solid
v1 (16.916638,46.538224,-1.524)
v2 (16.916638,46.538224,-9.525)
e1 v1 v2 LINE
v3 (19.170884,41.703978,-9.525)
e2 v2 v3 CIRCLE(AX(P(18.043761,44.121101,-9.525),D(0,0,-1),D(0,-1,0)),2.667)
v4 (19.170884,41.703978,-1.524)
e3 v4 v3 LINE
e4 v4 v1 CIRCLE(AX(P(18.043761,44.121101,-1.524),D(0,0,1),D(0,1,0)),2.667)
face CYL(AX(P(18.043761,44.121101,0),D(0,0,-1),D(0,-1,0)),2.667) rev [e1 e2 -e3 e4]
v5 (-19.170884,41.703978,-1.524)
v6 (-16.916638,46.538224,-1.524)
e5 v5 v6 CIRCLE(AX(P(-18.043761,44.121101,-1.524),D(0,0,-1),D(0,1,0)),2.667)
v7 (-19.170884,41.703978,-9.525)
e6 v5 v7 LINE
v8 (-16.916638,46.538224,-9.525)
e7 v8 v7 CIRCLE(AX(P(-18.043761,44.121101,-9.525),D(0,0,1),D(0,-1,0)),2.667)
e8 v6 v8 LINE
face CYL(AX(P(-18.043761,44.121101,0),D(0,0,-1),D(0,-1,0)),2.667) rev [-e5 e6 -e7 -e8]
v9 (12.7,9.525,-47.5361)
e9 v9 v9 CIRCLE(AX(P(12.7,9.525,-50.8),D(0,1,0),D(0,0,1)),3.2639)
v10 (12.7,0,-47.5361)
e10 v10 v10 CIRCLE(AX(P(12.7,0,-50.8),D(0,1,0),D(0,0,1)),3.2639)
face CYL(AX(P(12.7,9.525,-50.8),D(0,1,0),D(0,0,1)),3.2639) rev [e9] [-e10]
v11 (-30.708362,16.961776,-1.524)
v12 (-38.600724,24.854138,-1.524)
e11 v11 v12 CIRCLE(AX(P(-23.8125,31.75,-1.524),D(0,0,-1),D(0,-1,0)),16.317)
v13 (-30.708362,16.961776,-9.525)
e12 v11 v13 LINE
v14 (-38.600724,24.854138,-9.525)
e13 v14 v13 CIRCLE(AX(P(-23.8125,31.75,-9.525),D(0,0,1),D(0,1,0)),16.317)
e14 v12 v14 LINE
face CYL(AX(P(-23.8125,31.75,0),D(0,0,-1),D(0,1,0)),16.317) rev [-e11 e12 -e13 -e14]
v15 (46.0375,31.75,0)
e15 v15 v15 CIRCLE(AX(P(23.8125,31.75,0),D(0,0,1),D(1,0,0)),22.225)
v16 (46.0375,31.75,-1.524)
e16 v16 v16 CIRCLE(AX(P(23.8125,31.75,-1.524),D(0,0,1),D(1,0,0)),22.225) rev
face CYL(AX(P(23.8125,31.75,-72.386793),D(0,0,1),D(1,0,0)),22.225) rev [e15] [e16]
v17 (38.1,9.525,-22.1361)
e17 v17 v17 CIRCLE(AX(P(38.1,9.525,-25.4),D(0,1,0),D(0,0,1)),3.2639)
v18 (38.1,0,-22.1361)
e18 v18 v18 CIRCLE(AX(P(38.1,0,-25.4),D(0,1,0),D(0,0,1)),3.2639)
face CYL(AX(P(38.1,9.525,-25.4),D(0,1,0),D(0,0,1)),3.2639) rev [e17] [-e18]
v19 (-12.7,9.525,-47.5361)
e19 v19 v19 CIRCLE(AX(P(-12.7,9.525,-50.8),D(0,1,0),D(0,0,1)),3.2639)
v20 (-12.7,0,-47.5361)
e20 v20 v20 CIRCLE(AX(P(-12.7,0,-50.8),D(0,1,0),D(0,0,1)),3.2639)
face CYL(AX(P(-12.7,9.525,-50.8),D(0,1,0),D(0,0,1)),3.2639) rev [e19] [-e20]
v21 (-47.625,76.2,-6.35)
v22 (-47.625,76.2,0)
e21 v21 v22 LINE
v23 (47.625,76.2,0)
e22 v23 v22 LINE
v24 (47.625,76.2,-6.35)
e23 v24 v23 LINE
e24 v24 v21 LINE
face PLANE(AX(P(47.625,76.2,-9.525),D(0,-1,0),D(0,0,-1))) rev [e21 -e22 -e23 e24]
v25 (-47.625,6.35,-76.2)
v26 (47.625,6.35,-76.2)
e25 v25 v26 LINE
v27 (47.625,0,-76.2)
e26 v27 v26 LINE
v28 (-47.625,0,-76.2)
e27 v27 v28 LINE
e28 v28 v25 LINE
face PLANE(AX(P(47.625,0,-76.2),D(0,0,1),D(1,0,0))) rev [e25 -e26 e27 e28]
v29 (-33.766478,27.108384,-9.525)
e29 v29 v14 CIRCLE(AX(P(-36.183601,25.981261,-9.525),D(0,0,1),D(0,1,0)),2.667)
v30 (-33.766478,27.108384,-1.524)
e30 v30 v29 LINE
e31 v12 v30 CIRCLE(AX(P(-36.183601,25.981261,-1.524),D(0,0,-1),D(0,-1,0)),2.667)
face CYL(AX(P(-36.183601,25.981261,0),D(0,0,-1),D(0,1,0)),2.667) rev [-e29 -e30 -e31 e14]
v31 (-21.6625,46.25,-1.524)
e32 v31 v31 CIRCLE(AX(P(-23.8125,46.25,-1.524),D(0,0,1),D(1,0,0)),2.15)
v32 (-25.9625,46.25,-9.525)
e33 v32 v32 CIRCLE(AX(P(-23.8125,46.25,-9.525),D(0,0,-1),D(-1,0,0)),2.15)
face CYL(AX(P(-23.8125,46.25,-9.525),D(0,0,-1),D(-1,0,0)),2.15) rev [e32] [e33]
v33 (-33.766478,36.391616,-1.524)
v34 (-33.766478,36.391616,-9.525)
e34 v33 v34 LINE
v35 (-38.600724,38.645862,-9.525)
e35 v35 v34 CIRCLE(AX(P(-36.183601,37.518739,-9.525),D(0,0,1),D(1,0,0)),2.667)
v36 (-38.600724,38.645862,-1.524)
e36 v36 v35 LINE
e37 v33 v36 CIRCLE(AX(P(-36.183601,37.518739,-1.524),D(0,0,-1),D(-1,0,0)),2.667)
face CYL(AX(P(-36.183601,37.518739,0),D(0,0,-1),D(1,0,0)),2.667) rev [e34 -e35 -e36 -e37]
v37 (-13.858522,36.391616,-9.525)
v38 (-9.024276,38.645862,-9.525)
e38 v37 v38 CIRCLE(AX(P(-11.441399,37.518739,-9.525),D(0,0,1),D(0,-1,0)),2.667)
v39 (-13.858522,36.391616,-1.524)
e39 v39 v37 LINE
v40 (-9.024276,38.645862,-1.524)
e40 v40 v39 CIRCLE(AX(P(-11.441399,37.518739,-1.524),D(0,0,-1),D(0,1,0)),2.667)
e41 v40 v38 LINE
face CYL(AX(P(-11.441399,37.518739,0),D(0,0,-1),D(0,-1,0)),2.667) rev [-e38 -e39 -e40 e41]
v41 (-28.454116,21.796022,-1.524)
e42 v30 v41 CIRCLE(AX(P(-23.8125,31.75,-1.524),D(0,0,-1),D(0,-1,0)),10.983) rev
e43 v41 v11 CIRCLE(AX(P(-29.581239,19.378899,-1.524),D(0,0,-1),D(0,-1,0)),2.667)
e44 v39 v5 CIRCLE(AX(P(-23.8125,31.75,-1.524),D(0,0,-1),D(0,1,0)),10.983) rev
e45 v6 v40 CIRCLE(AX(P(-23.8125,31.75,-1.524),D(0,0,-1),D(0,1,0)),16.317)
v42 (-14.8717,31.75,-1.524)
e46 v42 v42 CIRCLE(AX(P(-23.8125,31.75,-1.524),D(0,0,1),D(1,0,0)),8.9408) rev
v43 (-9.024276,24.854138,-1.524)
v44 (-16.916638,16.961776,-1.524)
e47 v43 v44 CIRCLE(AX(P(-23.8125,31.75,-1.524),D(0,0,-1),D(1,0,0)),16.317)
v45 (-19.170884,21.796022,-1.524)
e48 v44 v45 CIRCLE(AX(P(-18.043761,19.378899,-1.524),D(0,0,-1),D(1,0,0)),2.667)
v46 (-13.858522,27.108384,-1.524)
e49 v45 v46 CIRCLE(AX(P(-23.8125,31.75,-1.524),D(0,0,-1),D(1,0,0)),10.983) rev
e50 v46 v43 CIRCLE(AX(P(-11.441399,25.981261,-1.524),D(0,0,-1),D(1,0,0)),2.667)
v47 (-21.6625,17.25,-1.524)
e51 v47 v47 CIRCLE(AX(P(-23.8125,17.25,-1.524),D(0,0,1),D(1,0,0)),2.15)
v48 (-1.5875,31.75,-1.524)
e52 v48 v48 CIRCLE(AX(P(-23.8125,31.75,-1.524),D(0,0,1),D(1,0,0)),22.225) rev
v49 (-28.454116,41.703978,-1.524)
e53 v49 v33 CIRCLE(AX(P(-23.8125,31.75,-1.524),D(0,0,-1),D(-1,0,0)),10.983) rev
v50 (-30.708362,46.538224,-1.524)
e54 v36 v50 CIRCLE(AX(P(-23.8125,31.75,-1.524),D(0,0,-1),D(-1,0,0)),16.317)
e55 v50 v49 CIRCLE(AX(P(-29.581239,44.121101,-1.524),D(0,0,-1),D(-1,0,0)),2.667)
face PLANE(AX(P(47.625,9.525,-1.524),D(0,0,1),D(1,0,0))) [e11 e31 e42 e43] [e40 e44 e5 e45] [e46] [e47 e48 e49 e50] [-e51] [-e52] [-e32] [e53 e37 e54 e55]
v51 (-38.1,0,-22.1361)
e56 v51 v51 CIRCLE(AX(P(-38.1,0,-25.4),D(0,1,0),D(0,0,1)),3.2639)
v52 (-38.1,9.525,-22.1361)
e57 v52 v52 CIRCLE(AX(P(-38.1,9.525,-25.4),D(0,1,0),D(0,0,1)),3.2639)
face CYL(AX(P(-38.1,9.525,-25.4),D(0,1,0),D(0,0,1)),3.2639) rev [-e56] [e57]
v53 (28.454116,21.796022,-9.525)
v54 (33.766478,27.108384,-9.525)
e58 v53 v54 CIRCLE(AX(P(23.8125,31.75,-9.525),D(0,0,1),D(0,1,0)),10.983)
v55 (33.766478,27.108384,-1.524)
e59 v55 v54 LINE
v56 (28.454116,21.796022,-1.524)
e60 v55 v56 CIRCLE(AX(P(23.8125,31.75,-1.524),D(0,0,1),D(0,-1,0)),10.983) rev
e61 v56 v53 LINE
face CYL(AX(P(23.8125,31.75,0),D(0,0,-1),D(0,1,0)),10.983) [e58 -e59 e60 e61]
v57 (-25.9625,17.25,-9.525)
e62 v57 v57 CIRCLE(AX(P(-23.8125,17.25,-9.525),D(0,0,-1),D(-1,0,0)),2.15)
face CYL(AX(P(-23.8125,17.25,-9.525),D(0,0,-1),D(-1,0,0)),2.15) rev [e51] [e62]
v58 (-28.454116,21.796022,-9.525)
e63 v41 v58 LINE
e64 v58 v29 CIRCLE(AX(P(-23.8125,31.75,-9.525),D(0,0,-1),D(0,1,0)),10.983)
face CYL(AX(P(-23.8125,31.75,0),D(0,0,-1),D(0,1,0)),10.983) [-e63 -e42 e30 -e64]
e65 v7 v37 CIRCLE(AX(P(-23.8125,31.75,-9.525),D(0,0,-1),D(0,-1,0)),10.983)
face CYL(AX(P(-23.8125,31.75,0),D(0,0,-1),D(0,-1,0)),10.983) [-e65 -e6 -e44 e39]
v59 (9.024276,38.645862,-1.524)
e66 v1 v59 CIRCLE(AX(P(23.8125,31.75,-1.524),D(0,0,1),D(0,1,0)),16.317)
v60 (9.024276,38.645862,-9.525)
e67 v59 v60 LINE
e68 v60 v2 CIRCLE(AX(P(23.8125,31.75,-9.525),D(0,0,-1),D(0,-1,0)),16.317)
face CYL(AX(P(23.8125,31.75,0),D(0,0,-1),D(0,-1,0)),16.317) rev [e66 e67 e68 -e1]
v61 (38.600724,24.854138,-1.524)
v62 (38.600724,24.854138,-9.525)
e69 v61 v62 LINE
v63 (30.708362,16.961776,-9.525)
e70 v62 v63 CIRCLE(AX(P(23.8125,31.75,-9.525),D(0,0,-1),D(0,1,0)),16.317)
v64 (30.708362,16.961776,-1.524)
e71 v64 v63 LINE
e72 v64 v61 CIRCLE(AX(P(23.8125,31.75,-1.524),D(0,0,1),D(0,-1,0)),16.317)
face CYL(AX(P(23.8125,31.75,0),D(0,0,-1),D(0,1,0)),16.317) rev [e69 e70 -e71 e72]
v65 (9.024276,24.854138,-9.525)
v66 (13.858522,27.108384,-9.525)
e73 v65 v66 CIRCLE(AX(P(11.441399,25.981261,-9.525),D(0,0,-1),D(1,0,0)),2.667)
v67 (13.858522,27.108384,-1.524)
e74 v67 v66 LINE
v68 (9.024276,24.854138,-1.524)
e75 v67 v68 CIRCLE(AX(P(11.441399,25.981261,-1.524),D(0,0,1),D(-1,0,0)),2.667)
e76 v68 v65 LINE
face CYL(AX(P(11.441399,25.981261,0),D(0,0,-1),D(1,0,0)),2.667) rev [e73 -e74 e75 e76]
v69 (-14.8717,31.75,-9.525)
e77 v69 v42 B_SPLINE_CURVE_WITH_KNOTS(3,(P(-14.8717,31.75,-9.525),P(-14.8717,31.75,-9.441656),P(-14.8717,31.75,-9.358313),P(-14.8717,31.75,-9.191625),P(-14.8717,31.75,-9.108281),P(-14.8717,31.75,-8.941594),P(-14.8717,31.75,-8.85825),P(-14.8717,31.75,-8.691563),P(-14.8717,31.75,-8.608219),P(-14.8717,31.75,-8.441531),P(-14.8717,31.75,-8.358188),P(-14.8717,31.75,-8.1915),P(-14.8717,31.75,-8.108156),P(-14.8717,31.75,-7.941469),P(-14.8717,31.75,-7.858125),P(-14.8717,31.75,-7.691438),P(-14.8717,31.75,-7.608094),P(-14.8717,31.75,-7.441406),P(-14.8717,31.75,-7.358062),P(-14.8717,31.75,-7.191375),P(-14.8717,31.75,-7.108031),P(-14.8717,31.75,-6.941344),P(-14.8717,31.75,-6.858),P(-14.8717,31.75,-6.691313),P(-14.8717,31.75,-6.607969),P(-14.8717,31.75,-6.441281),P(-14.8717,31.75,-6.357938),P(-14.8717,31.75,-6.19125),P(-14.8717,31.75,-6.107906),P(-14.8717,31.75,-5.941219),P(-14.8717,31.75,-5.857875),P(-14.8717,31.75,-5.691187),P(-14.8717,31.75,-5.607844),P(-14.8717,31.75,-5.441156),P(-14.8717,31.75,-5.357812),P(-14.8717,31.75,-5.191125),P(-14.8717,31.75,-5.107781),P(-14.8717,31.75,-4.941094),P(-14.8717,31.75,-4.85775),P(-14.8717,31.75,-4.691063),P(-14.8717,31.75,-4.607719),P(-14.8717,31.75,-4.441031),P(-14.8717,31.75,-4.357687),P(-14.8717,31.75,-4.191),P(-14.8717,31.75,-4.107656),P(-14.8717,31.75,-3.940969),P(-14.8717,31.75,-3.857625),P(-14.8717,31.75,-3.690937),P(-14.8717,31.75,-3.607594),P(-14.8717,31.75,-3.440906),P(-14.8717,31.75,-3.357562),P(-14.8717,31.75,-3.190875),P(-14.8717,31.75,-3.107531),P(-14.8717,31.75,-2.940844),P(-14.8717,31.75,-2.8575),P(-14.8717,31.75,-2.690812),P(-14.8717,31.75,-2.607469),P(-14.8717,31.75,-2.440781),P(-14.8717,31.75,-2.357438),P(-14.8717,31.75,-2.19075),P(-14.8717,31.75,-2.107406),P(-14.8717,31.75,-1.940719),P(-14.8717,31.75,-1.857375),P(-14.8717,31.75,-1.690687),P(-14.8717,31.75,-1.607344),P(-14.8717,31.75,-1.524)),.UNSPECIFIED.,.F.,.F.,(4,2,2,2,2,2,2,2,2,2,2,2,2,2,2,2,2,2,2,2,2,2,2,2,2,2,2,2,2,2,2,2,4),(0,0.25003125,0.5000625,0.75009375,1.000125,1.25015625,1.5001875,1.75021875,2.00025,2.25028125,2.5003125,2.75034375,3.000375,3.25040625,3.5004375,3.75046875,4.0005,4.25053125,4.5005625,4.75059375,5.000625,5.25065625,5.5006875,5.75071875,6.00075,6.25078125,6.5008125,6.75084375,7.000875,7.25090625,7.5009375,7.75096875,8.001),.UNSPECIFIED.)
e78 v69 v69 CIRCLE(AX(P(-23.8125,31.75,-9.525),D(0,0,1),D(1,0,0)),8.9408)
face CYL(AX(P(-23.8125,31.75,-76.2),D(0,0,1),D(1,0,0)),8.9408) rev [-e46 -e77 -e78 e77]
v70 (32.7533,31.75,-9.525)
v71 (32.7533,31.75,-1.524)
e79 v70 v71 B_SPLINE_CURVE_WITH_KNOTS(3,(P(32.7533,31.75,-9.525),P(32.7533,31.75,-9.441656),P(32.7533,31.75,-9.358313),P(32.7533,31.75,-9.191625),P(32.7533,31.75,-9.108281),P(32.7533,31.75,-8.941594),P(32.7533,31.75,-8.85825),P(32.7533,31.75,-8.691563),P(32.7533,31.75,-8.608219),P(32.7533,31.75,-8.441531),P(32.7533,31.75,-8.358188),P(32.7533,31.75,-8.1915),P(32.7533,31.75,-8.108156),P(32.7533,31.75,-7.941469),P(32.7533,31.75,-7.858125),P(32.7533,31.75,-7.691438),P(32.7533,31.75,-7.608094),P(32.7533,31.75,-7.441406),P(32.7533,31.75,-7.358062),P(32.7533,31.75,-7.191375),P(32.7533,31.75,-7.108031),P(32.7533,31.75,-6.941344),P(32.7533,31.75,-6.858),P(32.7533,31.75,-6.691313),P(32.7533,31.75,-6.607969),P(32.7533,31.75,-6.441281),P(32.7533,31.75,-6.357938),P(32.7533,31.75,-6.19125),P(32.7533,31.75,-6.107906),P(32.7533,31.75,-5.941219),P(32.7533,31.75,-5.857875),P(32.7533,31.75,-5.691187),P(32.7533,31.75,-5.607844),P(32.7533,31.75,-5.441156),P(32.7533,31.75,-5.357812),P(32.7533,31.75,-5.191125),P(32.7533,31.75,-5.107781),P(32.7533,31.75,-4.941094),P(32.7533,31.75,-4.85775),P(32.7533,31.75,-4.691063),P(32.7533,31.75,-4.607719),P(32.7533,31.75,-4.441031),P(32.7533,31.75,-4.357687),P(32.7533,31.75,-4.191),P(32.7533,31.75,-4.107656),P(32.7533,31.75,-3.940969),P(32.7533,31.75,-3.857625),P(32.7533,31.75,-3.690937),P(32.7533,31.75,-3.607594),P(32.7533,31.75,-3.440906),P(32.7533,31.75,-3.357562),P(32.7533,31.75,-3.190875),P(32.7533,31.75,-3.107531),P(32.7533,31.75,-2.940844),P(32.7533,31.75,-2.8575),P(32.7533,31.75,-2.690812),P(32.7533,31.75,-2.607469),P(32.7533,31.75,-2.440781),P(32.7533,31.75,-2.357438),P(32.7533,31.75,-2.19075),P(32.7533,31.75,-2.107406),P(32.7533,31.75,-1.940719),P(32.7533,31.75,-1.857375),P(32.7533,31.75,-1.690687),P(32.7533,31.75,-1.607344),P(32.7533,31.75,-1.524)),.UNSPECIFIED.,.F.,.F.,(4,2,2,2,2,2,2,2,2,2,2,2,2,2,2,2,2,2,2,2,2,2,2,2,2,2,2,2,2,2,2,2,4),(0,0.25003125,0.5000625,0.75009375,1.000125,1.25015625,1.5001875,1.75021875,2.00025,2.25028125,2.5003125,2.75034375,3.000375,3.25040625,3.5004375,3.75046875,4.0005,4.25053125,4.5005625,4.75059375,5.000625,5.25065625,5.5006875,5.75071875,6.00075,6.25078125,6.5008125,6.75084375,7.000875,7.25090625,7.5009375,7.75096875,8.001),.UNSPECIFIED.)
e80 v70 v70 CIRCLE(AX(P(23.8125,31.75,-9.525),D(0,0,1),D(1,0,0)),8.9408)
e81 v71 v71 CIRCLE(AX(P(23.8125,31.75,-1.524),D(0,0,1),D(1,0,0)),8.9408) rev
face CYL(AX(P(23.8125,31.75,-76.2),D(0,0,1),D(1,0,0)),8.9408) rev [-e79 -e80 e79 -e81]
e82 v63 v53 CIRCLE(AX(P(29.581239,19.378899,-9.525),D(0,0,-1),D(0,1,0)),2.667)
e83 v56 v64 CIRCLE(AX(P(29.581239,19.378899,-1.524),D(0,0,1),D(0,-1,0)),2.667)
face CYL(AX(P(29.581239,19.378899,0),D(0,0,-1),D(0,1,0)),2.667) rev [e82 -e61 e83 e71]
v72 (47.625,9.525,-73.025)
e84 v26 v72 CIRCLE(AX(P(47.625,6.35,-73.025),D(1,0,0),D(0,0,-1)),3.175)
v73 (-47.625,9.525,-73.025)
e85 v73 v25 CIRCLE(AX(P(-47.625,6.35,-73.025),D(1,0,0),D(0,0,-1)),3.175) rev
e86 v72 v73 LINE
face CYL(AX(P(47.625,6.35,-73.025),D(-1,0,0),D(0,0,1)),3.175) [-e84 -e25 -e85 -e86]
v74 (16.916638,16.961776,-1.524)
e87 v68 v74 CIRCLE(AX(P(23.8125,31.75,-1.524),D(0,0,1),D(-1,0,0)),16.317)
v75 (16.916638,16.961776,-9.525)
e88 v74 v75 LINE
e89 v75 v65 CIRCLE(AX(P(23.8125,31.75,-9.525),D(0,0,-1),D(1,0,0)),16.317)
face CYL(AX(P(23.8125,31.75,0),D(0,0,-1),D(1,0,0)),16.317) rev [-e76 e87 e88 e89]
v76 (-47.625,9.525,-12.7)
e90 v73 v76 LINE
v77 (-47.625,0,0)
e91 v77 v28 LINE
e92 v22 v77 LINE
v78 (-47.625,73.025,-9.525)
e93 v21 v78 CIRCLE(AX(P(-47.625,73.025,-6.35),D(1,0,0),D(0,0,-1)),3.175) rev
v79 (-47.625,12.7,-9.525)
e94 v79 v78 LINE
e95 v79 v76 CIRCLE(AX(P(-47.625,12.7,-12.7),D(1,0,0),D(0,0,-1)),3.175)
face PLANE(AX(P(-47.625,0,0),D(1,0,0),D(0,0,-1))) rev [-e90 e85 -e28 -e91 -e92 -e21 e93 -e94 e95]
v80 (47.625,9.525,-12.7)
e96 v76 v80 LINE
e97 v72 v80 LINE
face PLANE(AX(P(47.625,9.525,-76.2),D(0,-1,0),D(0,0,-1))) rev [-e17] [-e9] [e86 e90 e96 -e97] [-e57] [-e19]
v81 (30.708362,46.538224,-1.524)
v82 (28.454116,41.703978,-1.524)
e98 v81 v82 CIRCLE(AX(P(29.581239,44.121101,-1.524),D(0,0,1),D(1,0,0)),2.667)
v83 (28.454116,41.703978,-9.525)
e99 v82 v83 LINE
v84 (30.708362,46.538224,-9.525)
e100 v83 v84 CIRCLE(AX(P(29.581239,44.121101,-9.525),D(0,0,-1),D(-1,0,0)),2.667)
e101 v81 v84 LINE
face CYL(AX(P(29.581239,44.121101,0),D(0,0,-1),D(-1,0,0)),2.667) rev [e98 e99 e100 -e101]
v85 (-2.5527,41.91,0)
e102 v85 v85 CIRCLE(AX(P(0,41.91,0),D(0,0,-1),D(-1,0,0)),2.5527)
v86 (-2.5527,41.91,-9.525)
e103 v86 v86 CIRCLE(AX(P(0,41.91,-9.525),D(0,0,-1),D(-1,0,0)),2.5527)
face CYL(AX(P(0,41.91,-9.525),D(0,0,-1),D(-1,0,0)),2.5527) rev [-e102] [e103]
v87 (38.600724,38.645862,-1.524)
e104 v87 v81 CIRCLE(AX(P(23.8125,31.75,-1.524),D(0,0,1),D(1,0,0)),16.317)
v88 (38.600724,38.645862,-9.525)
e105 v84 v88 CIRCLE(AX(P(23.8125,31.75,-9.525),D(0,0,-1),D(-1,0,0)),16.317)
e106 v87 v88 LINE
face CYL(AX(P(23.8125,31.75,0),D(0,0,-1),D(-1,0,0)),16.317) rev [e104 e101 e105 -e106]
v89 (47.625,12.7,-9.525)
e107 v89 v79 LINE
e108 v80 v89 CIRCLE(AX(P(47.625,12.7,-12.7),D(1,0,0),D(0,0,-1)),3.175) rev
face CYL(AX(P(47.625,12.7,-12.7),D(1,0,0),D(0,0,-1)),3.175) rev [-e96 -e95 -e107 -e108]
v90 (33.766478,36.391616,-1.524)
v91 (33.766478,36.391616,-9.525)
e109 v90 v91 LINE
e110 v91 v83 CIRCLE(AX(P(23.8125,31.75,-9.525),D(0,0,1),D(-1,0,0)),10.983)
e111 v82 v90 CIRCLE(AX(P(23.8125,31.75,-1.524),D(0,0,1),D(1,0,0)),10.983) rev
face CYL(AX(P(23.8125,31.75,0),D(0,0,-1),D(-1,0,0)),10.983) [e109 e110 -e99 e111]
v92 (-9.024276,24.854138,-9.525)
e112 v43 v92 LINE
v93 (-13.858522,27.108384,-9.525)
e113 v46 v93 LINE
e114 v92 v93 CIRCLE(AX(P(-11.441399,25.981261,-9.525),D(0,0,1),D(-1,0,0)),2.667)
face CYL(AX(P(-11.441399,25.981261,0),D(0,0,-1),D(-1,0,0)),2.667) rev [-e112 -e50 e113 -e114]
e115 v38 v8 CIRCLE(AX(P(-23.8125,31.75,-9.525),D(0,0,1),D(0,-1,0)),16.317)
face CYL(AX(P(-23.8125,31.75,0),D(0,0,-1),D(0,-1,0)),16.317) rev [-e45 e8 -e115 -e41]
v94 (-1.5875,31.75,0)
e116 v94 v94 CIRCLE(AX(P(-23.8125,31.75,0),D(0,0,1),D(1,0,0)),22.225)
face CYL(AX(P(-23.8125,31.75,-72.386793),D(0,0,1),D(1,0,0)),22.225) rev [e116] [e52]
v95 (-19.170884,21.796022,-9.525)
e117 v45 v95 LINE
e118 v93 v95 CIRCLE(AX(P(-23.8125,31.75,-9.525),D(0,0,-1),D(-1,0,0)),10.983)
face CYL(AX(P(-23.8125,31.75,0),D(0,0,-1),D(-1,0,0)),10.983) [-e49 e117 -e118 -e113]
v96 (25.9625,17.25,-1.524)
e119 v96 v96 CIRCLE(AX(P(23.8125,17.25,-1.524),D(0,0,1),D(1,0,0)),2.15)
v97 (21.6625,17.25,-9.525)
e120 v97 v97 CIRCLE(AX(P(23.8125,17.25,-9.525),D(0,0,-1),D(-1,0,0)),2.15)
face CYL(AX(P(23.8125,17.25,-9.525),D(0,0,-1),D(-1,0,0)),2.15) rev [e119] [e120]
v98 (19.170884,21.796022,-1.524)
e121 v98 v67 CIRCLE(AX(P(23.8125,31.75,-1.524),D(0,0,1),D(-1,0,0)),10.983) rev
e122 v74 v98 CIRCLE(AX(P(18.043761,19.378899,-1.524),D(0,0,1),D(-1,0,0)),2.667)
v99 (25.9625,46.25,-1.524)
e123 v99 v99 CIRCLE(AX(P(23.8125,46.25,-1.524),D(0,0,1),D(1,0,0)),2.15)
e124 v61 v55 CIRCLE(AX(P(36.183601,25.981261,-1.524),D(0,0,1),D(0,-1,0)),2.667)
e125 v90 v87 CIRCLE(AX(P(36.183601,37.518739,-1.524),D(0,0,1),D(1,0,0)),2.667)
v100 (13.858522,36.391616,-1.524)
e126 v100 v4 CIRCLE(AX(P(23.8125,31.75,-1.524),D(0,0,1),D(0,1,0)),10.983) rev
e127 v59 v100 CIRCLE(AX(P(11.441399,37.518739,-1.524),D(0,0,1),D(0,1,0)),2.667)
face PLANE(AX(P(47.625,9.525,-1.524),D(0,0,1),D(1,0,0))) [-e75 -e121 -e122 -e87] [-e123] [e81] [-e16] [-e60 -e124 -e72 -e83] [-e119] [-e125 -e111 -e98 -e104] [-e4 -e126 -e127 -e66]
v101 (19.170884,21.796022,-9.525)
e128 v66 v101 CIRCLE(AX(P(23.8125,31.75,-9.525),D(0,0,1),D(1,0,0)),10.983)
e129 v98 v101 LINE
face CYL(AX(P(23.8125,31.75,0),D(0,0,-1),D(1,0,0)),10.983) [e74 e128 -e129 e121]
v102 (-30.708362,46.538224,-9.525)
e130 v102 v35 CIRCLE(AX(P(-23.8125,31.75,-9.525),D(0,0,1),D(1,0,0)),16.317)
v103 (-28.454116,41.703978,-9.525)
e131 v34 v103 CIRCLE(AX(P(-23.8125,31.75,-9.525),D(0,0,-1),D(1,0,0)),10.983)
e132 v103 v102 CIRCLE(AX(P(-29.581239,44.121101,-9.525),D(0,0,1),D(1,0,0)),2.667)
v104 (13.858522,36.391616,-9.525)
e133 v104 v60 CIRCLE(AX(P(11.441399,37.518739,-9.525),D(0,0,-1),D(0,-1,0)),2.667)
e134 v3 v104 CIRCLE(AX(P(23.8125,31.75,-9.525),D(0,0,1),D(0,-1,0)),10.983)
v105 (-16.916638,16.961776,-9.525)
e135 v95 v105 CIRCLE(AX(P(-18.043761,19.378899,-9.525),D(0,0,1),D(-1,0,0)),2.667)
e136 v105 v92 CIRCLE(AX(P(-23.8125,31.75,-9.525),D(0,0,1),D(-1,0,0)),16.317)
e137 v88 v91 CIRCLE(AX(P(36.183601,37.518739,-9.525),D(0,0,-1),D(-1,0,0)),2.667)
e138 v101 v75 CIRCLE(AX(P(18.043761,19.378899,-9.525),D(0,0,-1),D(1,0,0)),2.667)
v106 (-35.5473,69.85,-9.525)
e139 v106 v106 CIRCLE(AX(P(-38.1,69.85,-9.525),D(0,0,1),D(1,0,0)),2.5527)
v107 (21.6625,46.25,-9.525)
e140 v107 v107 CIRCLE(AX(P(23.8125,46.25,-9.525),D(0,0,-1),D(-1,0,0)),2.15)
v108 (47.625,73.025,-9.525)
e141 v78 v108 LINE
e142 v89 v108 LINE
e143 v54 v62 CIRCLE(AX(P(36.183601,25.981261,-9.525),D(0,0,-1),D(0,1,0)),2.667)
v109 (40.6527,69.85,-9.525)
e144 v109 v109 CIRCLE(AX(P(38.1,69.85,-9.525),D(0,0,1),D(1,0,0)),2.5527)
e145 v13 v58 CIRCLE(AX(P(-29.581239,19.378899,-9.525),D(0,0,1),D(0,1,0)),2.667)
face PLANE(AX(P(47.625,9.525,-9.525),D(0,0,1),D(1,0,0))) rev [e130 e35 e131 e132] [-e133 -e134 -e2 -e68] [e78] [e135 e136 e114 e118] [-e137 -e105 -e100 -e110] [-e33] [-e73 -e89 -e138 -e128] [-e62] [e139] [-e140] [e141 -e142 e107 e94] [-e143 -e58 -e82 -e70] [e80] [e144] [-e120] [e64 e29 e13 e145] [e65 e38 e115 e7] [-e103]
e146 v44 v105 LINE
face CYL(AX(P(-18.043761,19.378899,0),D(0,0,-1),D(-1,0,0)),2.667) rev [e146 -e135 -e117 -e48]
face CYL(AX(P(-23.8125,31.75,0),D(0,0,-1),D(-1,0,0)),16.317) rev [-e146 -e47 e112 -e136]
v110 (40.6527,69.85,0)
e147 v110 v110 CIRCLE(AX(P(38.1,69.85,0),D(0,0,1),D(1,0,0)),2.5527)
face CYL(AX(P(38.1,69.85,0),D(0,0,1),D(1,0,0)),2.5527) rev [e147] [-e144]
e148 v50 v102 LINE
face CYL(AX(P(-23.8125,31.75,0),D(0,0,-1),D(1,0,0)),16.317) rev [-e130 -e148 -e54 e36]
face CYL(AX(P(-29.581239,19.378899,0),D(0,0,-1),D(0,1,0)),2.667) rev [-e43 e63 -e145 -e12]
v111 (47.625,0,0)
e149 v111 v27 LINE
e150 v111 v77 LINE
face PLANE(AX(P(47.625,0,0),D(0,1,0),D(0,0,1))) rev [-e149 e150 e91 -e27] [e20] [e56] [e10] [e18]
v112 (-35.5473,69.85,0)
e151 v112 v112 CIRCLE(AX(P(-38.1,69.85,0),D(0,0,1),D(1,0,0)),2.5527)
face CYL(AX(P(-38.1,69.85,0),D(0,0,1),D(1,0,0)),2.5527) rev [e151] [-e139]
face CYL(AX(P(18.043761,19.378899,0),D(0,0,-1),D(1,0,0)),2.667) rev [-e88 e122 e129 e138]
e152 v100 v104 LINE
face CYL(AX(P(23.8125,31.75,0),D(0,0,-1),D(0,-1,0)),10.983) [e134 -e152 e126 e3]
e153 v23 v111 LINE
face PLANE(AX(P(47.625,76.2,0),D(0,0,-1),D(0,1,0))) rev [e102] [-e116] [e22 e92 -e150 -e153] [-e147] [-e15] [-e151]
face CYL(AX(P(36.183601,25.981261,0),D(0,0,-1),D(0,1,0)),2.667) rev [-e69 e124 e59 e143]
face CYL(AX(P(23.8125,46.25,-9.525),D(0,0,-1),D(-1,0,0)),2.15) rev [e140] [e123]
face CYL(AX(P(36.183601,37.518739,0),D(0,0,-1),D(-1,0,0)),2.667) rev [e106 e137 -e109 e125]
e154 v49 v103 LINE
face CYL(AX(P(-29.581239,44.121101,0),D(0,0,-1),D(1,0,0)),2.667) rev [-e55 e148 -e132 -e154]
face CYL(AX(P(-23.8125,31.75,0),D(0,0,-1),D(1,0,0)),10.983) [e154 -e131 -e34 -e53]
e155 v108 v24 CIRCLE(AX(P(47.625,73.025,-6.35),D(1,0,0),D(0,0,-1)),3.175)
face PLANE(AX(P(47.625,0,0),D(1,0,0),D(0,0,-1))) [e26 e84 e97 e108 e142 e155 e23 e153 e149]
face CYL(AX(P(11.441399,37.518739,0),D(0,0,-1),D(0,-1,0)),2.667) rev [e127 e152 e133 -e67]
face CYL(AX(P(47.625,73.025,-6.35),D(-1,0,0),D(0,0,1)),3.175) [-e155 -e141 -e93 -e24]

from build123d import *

# Parameters (mm, degrees)
BOSS_EXTRUDE1_DEPTH     = 47.625
FILLET1_R               = 3.175
F_1_4_20_TAPPED_HOLE1_D = 5.1054
SKETCH6_R               = 8.9408
CUT_EXTRUDE1_DEPTH      = 118.817743252
SKETCH7_R               = 22.225
CUT_EXTRUDE2_DEPTH      = 1.524
F_1_4_20_TAPPED_HOLE2_D = 5.1054
M4_CLEARANCE_HOLE1_D    = 4.3
CUT_EXTRUDE3_DEPTH      = 140.693552859
CIRPATTERN1_START       = -9.525
CIRPATTERN1_DEPTH       = 8.001
F_1_4_CLEARANCE_HOLE1_D = 6.5278


# Read off the part's stored shape, not the designer's step: CirPattern1
with BuildPart() as part:
    # Sketch1 → Boss-Extrude1 (new, symmetric)
    with BuildSketch(Plane(origin=(0, 0, 0), x_dir=(0, 0, -1), z_dir=(1, 0, 0))):
        Polygon((0, 76.2), (0, 0), (76.2, 0), (76.2, 9.525), (9.525, 9.525), (9.525, 76.2), align=None)
    extrude(amount=BOSS_EXTRUDE1_DEPTH, both=True)

    # Fillet1
    fillet1_edges = [part.edges().sort_by_distance(p)[0] for p in [
        (0, 76.2, -9.525),
        (0, 9.525, -9.525),
        (0, 9.525, -76.2),
    ]]
    fillet(fillet1_edges, radius=FILLET1_R)

    # 1/4-20 Tapped Hole1 (through all)
    with Locations(Plane.XY):
        with Locations((-38.1, 69.85), (38.1, 69.85)):
            Hole(F_1_4_20_TAPPED_HOLE1_D / 2)

    # Sketch6 → Cut-Extrude1 (cut, through all)
    with BuildSketch(Plane.XY):
        with Locations((-23.8125, 31.75)):
            Circle(SKETCH6_R)
        with Locations((23.8125, 31.75)):
            Circle(SKETCH6_R)
    extrude(amount=-CUT_EXTRUDE1_DEPTH, mode=Mode.SUBTRACT)

    # Sketch7 → Cut-Extrude2 (cut)
    with BuildSketch(Plane.XY):
        with Locations((-23.8125, 31.75)):
            Circle(SKETCH7_R)
        with Locations((23.8125, 31.75)):
            Circle(SKETCH7_R)
    extrude(amount=-CUT_EXTRUDE2_DEPTH, mode=Mode.SUBTRACT)

    # 1/4-20 Tapped Hole2 (through all)
    with Locations(Plane(origin=(0, 0, -9.525), x_dir=(-1, 0, 0), z_dir=(0, 0, -1))):
        with Locations((0, 41.91)):
            Hole(F_1_4_20_TAPPED_HOLE2_D / 2)

    # M4 Clearance Hole1 (through all)
    with Locations(Plane(origin=(-35.918168185, -13.740381004, -9.525), x_dir=(-1, 0, 0), z_dir=(0, 0, -1))):
        with Locations((-59.730668185, 59.990381004), (-59.730668185, 30.990381004), (-12.105668185, 30.990381004), (-12.105668185, 59.990381004)):
            Hole(M4_CLEARANCE_HOLE1_D / 2)

    # Sketch12 → Cut-Extrude3 (cut, through all)
    with BuildSketch(Plane(origin=(-35.918168185, -13.740381004, -9.525), x_dir=(-1, 0, 0), z_dir=(0, 0, -1))):
        with BuildLine():
            ThreePointArc((-66.626530361, 60.278605165), (-71.268529533, 57.028242353), (-74.518892346, 52.386243181))
            ThreePointArc((-74.518892346, 52.386243181), (-73.228892382, 48.841997409), (-69.68464661, 50.131997373))
            ThreePointArc((-69.68464661, 50.131997373), (-67.496821962, 53.256534782), (-64.372284553, 55.444359429))
            ThreePointArc((-64.372284553, 55.444359429), (-63.082284589, 58.988605201), (-66.626530361, 60.278605165))
        make_face()
    cut_extrude3 = extrude(amount=-CUT_EXTRUDE3_DEPTH, mode=Mode.SUBTRACT)

    # CirPattern1 outline → CirPattern1 (cut)
    with BuildSketch(Plane.XY.offset(CIRPATTERN1_START)):
        with BuildLine():
            ThreePointArc((9.024275839, 38.645862177), (10.314275803, 35.101616405), (13.858521575, 36.391616369))
            ThreePointArc((13.858521575, 36.391616369), (16.046346222, 39.516153778), (19.170883631, 41.703978425))
            ThreePointArc((19.170883631, 41.703978425), (20.460883595, 45.248224197), (16.916637823, 46.538224161))
            ThreePointArc((16.916637823, 46.538224161), (12.274638651, 43.287861349), (9.024275839, 38.645862177))
        make_face()
        with BuildLine():
            ThreePointArc((38.600724161, 24.854137823), (37.310724197, 28.398383595), (33.766478425, 27.108383631))
            ThreePointArc((33.766478425, 27.108383631), (31.578653778, 23.983846222), (28.454116369, 21.796021575))
            ThreePointArc((28.454116369, 21.796021575), (27.164116405, 18.251775803), (30.708362177, 16.961775839))
            ThreePointArc((30.708362177, 16.961775839), (35.350361349, 20.212138651), (38.600724161, 24.854137823))
        make_face()
        with BuildLine():
            ThreePointArc((16.916637823, 16.961775839), (20.460883595, 18.251775803), (19.170883631, 21.796021575))
            ThreePointArc((19.170883631, 21.796021575), (16.046346222, 23.983846222), (13.858521575, 27.108383631))
            ThreePointArc((13.858521575, 27.108383631), (10.314275803, 28.398383595), (9.024275839, 24.854137823))
            ThreePointArc((9.024275839, 24.854137823), (12.274638651, 20.212138651), (16.916637823, 16.961775839))
        make_face()
    cirpattern1 = extrude(amount=CIRPATTERN1_DEPTH, mode=Mode.SUBTRACT)

    # Mirror1: Cut-Extrude3, CirPattern1 across plane
    add(cut_extrude3.mirror(Plane(origin=(0, 0, 0), x_dir=(0, 0, 1), z_dir=(1, 0, 0))), mode=Mode.SUBTRACT)
    add(cirpattern1.mirror(Plane(origin=(0, 0, 0), x_dir=(0, 0, 1), z_dir=(1, 0, 0))), mode=Mode.SUBTRACT)

    # 1/4 Clearance Hole1 (through all)
    with Locations(Plane(origin=(0, 9.525, 0), x_dir=(1, 0, 0), z_dir=(0, 1, 0))):
        with Locations((-38.1, 25.4), (38.1, 25.4), (-12.7, 50.8), (12.7, 50.8)):
            Hole(F_1_4_CLEARANCE_HOLE1_D / 2)


solid = part.part
